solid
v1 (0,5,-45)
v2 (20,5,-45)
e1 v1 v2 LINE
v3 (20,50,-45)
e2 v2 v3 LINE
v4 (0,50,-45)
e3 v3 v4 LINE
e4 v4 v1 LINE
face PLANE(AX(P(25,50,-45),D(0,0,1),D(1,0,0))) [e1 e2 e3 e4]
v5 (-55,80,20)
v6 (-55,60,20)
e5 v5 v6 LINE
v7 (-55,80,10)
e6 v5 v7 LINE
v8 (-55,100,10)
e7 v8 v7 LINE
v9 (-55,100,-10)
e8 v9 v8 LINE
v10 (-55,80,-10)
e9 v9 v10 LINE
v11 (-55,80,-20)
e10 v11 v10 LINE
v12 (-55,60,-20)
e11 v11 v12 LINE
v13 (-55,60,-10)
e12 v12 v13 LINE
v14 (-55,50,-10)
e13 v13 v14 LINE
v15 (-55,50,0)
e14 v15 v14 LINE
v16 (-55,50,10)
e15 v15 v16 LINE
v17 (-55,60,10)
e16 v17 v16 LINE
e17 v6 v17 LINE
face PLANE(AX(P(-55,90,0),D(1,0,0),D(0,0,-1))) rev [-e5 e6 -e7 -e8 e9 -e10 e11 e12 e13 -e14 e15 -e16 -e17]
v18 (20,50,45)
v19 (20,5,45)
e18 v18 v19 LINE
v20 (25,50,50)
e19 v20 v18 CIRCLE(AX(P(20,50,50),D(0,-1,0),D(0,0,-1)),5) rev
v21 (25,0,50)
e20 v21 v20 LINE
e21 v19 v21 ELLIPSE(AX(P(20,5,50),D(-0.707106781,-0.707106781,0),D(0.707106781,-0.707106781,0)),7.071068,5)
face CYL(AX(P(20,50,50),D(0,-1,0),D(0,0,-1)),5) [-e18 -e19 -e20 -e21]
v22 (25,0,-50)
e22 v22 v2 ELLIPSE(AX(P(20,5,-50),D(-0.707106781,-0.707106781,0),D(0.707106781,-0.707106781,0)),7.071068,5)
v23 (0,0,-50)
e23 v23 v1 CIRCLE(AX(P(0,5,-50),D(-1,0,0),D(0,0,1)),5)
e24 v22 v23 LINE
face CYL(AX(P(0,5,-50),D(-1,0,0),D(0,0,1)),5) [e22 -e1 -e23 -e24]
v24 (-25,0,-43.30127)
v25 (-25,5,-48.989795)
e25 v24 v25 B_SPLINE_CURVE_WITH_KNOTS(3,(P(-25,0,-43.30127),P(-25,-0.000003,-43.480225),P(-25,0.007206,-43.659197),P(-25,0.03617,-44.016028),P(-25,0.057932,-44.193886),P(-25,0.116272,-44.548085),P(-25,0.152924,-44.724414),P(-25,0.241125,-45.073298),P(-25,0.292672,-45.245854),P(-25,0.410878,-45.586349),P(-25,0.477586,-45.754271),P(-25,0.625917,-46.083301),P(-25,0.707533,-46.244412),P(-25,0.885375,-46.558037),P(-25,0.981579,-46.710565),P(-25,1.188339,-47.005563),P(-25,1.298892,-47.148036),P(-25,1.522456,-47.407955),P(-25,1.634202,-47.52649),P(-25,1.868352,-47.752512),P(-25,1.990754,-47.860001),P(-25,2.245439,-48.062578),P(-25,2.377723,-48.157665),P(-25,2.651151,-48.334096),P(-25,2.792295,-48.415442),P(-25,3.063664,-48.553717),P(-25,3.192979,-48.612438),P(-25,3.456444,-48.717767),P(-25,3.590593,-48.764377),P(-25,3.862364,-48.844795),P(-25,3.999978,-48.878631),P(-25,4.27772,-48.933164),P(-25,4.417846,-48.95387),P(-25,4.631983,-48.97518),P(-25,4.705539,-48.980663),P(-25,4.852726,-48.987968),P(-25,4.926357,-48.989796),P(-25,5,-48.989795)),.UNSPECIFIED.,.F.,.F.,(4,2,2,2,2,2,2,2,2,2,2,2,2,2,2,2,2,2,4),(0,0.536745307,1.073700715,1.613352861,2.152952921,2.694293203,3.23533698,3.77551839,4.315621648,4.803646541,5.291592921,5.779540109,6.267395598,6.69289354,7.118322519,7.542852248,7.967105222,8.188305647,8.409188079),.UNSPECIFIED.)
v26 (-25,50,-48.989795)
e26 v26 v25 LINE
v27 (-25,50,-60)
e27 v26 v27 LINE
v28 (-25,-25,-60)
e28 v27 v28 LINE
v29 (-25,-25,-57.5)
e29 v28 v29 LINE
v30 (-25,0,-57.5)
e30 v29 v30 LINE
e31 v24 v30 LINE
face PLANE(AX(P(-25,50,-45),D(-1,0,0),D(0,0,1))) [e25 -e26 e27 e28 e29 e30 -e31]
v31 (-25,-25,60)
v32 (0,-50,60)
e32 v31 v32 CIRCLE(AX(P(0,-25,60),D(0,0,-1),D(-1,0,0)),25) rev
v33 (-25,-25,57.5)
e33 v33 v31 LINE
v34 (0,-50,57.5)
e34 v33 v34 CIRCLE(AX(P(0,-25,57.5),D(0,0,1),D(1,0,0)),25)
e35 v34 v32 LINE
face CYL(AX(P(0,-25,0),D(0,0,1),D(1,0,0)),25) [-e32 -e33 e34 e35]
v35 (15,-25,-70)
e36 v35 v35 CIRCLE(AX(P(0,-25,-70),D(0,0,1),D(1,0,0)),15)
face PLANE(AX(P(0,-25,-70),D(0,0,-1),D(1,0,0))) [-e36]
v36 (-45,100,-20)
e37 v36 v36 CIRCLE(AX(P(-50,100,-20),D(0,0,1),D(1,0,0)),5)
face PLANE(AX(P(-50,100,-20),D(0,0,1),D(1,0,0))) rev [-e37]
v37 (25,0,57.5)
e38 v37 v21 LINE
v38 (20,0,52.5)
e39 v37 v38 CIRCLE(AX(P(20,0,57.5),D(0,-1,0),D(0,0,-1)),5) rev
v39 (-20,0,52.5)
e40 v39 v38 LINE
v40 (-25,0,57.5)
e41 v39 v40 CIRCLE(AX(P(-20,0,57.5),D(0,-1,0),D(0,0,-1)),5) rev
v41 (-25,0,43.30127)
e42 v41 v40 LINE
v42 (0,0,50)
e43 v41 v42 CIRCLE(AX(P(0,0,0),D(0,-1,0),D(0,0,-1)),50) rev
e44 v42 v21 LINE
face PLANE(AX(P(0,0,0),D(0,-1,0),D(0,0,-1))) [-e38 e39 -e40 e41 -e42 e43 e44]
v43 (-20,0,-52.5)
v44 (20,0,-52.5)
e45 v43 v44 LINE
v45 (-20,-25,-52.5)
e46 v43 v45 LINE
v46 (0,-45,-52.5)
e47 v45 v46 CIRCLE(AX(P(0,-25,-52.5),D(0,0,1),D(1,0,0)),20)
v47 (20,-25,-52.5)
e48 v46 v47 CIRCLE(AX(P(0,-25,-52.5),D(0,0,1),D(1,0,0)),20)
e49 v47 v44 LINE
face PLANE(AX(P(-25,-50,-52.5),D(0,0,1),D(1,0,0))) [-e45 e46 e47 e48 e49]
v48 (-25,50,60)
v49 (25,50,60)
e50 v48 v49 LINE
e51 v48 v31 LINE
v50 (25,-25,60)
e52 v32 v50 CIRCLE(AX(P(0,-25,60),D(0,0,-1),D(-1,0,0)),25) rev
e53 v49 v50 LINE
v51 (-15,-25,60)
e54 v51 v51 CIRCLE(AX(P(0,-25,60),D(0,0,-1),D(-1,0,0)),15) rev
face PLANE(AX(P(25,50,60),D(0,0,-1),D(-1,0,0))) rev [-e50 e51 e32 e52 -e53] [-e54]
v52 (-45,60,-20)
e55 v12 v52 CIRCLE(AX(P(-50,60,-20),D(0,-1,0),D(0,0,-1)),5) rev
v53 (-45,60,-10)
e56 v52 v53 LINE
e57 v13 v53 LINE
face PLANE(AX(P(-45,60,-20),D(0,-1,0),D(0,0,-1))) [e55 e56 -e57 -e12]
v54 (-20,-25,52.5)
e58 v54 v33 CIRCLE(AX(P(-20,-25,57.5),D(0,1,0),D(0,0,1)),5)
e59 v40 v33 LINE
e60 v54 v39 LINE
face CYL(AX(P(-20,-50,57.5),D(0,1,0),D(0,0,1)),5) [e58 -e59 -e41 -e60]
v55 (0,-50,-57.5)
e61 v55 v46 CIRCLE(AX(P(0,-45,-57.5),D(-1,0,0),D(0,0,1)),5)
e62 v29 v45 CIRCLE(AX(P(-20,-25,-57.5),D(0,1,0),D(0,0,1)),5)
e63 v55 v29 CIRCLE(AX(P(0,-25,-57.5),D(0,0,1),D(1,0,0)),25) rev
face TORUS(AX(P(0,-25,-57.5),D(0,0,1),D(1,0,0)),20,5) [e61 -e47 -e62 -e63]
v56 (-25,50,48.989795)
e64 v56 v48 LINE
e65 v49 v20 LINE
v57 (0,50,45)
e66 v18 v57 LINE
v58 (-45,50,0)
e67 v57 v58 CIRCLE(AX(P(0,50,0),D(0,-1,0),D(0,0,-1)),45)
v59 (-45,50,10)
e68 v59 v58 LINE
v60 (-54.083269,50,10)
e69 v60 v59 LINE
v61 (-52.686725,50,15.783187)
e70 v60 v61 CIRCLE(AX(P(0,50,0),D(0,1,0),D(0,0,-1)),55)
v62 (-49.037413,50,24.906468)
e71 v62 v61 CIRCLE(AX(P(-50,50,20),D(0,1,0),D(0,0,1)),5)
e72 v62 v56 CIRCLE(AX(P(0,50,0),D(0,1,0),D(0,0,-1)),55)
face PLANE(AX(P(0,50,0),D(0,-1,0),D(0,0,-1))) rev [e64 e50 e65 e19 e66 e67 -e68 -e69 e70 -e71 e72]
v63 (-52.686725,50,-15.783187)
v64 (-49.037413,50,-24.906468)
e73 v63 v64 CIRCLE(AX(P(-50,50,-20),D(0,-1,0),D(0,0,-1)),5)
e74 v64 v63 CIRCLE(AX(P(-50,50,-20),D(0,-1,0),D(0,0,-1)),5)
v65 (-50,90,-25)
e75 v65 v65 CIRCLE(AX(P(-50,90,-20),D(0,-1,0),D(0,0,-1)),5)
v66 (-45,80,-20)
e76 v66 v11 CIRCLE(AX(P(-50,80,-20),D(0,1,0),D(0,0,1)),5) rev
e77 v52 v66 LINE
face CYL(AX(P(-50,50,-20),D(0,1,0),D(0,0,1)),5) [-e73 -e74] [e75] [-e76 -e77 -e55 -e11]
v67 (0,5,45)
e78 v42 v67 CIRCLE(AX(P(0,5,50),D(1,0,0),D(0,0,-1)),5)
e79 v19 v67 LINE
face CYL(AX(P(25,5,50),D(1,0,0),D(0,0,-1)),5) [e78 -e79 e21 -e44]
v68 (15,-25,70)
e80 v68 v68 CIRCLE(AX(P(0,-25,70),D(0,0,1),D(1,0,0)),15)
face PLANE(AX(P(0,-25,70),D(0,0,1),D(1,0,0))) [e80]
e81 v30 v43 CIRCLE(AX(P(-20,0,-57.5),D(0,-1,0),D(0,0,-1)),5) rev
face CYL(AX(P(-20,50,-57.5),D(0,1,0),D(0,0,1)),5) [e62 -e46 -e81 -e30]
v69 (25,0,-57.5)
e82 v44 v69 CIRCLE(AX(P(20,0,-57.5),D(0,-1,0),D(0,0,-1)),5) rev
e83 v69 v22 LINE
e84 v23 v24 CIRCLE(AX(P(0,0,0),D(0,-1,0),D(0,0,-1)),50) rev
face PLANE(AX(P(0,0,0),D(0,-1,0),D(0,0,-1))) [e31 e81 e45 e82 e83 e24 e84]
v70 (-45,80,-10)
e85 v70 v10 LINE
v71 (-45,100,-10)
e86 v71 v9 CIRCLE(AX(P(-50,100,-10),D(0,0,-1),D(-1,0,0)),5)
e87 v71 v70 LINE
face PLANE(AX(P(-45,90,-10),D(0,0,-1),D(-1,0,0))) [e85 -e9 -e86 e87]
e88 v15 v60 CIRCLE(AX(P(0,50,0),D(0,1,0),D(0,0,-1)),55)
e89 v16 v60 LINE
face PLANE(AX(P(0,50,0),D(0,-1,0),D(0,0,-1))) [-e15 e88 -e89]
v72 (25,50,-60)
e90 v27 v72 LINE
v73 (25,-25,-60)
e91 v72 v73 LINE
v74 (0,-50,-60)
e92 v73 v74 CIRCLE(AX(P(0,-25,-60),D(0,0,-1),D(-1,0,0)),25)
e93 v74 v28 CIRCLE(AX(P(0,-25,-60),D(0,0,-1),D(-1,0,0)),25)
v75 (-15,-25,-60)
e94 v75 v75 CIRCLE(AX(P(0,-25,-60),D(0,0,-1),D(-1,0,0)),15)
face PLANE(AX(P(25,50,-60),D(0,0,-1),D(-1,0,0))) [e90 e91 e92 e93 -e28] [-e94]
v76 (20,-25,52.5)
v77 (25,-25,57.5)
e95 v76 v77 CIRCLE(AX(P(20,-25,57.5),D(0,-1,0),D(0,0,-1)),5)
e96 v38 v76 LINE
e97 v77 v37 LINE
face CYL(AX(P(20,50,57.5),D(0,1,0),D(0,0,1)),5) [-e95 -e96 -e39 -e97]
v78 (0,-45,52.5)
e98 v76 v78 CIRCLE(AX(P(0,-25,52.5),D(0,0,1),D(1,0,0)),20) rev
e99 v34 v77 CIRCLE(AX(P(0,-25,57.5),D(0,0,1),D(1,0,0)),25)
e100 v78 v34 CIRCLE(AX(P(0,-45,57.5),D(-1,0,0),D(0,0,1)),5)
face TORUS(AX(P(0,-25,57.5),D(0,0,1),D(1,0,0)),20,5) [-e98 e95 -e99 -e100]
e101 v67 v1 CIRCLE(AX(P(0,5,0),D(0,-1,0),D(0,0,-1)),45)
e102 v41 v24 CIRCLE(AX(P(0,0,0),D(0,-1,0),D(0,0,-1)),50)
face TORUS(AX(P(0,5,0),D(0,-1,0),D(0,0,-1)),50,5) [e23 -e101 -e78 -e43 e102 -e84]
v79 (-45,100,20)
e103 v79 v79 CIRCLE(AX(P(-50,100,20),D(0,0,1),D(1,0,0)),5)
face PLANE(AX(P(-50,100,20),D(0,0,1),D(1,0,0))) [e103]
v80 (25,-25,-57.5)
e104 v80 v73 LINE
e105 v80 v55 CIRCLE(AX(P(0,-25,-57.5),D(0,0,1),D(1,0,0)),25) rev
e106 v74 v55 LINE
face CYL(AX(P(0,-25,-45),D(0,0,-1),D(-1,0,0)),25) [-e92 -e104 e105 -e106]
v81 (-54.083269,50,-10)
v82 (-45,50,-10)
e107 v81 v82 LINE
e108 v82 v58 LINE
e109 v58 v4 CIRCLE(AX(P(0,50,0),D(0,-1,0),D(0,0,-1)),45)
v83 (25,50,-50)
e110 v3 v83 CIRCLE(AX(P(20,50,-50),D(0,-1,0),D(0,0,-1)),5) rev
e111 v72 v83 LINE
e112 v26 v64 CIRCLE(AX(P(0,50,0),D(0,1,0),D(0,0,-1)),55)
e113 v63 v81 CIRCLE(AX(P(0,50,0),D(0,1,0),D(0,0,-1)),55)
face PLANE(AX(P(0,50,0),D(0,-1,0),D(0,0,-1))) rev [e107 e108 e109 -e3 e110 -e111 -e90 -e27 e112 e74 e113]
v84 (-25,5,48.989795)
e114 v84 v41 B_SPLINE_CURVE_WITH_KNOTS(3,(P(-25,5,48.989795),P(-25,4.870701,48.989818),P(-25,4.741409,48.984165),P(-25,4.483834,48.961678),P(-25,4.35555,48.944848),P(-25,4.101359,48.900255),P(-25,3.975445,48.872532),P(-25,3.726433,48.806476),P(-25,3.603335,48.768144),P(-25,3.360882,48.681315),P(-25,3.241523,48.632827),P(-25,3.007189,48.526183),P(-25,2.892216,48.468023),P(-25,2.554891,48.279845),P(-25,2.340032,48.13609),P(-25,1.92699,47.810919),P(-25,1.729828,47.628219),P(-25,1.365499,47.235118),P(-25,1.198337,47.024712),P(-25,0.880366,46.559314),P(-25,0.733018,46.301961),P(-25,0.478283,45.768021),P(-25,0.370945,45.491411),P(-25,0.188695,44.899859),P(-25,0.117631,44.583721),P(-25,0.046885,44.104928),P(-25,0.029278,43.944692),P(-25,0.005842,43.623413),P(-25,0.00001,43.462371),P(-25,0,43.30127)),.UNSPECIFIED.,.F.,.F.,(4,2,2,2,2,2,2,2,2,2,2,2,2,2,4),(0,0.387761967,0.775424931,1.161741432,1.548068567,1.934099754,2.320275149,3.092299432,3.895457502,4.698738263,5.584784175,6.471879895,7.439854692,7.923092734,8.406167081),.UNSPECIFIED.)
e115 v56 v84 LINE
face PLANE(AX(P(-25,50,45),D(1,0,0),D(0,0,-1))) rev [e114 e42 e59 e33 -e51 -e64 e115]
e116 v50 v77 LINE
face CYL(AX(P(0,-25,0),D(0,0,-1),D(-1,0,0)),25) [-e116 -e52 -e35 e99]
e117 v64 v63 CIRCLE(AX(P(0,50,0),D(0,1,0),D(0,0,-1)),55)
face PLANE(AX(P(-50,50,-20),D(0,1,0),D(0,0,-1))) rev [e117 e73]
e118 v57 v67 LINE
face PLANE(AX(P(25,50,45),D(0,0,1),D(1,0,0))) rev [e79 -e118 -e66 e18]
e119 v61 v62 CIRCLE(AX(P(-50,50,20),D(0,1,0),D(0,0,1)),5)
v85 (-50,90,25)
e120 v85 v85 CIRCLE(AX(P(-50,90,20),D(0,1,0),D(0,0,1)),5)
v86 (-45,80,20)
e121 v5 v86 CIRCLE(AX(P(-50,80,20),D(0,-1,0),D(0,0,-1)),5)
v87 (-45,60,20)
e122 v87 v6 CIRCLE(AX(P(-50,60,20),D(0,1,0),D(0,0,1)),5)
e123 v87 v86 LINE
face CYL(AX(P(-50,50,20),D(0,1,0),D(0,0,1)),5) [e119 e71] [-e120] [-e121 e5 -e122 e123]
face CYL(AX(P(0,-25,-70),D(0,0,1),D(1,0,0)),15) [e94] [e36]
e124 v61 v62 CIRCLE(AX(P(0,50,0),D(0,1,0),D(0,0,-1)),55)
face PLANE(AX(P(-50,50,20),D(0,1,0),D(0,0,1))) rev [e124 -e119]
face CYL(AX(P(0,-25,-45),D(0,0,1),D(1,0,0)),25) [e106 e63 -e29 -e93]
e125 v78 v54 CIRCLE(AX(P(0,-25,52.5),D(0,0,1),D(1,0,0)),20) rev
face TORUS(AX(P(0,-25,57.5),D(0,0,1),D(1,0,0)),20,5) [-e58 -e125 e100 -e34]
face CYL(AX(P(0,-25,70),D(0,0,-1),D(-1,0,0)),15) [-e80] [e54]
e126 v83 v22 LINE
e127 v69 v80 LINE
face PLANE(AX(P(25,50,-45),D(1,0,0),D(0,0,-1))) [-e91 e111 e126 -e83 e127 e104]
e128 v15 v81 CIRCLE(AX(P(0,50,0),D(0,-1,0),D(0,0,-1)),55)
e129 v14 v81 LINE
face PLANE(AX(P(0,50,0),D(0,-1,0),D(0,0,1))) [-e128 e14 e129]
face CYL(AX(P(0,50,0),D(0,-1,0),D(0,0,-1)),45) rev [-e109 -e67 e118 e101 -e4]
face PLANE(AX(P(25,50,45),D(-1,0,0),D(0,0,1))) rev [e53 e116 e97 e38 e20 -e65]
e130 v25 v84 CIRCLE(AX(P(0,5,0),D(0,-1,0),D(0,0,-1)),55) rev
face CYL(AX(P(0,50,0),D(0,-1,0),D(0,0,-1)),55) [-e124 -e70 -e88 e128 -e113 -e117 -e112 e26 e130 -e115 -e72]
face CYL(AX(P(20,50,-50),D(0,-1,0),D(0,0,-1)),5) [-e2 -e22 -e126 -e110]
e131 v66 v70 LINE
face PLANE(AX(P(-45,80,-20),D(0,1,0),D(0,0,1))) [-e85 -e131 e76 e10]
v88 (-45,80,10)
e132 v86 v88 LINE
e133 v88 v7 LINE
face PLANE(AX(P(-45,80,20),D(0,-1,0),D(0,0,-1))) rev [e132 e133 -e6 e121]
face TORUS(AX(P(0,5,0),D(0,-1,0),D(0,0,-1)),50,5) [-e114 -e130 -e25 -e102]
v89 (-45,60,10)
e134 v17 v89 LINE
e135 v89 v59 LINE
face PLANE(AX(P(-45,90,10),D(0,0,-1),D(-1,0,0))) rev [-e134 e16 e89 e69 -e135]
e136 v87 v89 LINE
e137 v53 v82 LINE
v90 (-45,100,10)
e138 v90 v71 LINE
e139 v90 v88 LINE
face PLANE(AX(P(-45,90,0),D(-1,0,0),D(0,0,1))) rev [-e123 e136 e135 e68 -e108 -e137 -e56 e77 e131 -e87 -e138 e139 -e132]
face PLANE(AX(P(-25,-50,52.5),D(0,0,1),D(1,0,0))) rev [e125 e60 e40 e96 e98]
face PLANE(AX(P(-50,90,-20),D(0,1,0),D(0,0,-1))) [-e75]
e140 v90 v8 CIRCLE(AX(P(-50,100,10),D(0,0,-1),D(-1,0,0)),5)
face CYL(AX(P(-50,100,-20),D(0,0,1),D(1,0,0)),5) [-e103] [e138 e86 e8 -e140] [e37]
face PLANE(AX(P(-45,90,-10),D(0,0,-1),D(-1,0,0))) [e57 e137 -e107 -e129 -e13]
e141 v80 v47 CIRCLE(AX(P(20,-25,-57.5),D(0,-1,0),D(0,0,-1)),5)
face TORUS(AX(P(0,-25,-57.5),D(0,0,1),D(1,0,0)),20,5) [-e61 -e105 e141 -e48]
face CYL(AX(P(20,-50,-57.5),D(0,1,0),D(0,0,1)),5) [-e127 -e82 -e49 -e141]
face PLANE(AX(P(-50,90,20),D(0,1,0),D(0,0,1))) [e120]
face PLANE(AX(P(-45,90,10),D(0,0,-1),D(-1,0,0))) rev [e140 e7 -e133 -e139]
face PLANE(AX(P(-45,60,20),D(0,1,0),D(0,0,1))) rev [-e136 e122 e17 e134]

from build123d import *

# Parameters (mm, degrees)
BOSS_EXTRUDE1_DEPTH      = 50
SKETCH2_W                = 50
SKETCH2_H                = 15
BOSS_EXTRUDE2_DEPTH      = 50
SKETCH3_W                = 50
SKETCH3_H                = 7.5
BOSS_EXTRUDE3_DEPTH      = 50
SKETCH4_R                = 15
BOSS_EXTRUDE4_DEPTH      = 10
FILLET1_R                = 25
FILLET1_OF_MIRROR1_R     = 25
FILLET2_R                = 5
SKETCH5_W                = 10
SKETCH5_H                = 10
BOSS_EXTRUDE5_DEPTH      = 40
SKETCH6_W                = 10
SKETCH6_H                = 20
BOSS_EXTRUDE6_DEPTH      = 10
BOSS_EXTRUDE7_START      = -30
SKETCH7_R                = 5
BOSS_EXTRUDE7_DEPTH      = 40
SKETCH8_W                = 10
SKETCH8_H                = 20
BOSS_EXTRUDE8_DEPTH      = 10
BOSS_EXTRUDE9_DEPTH      = 20
BOSS_EXTRUDE9_DEPTH_BACK = 20
SKETCH9_R                = 5


with BuildPart() as part:
    # Sketch1 → Boss-Extrude1 (new body)
    with BuildSketch(Plane(origin=(0, 0, 0), x_dir=(1, 0, 0), z_dir=(0, 1, 0))):
        with BuildLine():
            Line((0, 55), (0, 45))
            ThreePointArc((0, 45), (-45, 0), (0, -45))
            Line((0, -45), (0, -55))
            ThreePointArc((0, -55), (-55, 0), (0, 55))
        make_face()
    extrude(amount=BOSS_EXTRUDE1_DEPTH)

    # Sketch2 → Boss-Extrude2 (add)
    with BuildSketch(Plane(origin=(0, 0, 0), x_dir=(1, 0, 0), z_dir=(0, 1, 0))):
        with Locations((0, -52.5)):
            Rectangle(SKETCH2_W, SKETCH2_H)
    boss_extrude2 = extrude(amount=BOSS_EXTRUDE2_DEPTH)

    # Sketch3 → Boss-Extrude3 (add)
    with BuildSketch(Plane.XZ):
        with Locations((0, 56.25)):
            Rectangle(SKETCH3_W, SKETCH3_H)
    boss_extrude3 = extrude(amount=BOSS_EXTRUDE3_DEPTH)

    # Sketch4 → Boss-Extrude4 (add)
    with BuildSketch(Plane.XY.offset(60)):
        with Locations(Location((0, -25, 0), (0, 0, 180))):
            Circle(SKETCH4_R)
    boss_extrude4 = extrude(amount=BOSS_EXTRUDE4_DEPTH)

    # Fillet1
    fillet1_edges = [part.edges().sort_by_distance(p)[0] for p in [
        (-25, -50, 56.25),
        (25, -50, 56.25),
    ]]
    fillet(fillet1_edges, radius=FILLET1_R - 0.0001)  # a hair under: the kernel refuses the full size

    # Mirror1: Boss-Extrude2, Boss-Extrude3, Boss-Extrude4 across plane
    add(boss_extrude2.mirror(Plane.XY))
    add(boss_extrude3.mirror(Plane.XY))
    add(boss_extrude4.mirror(Plane.XY))

    # Fillet1 of Mirror1
    fillet1_of_mirror1_edges = [part.edges().sort_by_distance(p)[0] for p in [
        (-25, -50, -56.25),
        (25, -50, -56.25),
    ]]
    fillet(fillet1_of_mirror1_edges, radius=FILLET1_OF_MIRROR1_R - 0.0001)  # a hair under: the kernel refuses the full size

    # Fillet2
    fillet2_edges = [part.edges().sort_by_distance(p)[0] for p in [
        (-25, -12.50005, -52.5),
        (-17.677698819, -42.677698819, -52.5),
        (17.677698819, -42.677698819, -52.5),
        (-25, -12.50005, 52.5),
        (-17.677698819, -42.677698819, 52.5),
        (17.677698819, -42.677698819, 52.5),
        (12.5, 0, 45),
        (12.5, 0, -45),
        (-55, 0, 0),
        (25, -12.50005, -52.5),
        (25, -12.50005, 52.5),
        (-45, 0, 0),
        (25, 25, 45),
        (25, 25, -45),
    ]]
    fillet(fillet2_edges, radius=FILLET2_R - 0.0001)  # a hair under: the kernel refuses the full size

    # Sketch5 → Boss-Extrude5 (add)
    with BuildSketch(Plane(origin=(0, 50, 0), x_dir=(1, 0, 0), z_dir=(0, 1, 0))):
        with Locations((-50, -5)):
            Rectangle(SKETCH5_W, SKETCH5_H)
    boss_extrude5 = extrude(amount=BOSS_EXTRUDE5_DEPTH)

    # Sketch6 → Boss-Extrude6 (add)
    with BuildSketch(Plane.XY.offset(10)):
        with Locations((-50, 70)):
            Rectangle(SKETCH6_W, SKETCH6_H)
    boss_extrude6 = extrude(amount=BOSS_EXTRUDE6_DEPTH)

    # Sketch7 → Boss-Extrude7 (add)
    with BuildSketch(Plane(origin=(0, 80, 0), x_dir=(1, 0, 0), z_dir=(0, 1, 0)).offset(BOSS_EXTRUDE7_START)):
        with Locations(Location((-50, -20, 0), (0, 0, 270))):
            Circle(SKETCH7_R)
    boss_extrude7 = extrude(amount=BOSS_EXTRUDE7_DEPTH)

    # Mirror2: Boss-Extrude5, Boss-Extrude6, Boss-Extrude7 across plane
    add(boss_extrude5.mirror(Plane(origin=(-45, 90, 0), x_dir=(1, 0, 0), z_dir=(0, 0, 1))))
    add(boss_extrude6.mirror(Plane(origin=(-45, 90, 0), x_dir=(1, 0, 0), z_dir=(0, 0, 1))))
    add(boss_extrude7.mirror(Plane(origin=(-45, 90, 0), x_dir=(1, 0, 0), z_dir=(0, 0, 1))))

    # Sketch8 → Boss-Extrude8 (add)
    with BuildSketch(Plane(origin=(0, 90, 0), x_dir=(1, 0, 0), z_dir=(0, 1, 0))):
        with Locations((-50, 0)):
            Rectangle(SKETCH8_W, SKETCH8_H)
    extrude(amount=BOSS_EXTRUDE8_DEPTH)

    # Sketch9 → Boss-Extrude9 (add, two sides: drawn at the far end of the back side and taken through both)
    with BuildSketch(Plane.XY.offset(-BOSS_EXTRUDE9_DEPTH_BACK)):
        with Locations((-50, 100)):
            Circle(SKETCH9_R)
    extrude(amount=BOSS_EXTRUDE9_DEPTH + BOSS_EXTRUDE9_DEPTH_BACK)


solid = part.part
